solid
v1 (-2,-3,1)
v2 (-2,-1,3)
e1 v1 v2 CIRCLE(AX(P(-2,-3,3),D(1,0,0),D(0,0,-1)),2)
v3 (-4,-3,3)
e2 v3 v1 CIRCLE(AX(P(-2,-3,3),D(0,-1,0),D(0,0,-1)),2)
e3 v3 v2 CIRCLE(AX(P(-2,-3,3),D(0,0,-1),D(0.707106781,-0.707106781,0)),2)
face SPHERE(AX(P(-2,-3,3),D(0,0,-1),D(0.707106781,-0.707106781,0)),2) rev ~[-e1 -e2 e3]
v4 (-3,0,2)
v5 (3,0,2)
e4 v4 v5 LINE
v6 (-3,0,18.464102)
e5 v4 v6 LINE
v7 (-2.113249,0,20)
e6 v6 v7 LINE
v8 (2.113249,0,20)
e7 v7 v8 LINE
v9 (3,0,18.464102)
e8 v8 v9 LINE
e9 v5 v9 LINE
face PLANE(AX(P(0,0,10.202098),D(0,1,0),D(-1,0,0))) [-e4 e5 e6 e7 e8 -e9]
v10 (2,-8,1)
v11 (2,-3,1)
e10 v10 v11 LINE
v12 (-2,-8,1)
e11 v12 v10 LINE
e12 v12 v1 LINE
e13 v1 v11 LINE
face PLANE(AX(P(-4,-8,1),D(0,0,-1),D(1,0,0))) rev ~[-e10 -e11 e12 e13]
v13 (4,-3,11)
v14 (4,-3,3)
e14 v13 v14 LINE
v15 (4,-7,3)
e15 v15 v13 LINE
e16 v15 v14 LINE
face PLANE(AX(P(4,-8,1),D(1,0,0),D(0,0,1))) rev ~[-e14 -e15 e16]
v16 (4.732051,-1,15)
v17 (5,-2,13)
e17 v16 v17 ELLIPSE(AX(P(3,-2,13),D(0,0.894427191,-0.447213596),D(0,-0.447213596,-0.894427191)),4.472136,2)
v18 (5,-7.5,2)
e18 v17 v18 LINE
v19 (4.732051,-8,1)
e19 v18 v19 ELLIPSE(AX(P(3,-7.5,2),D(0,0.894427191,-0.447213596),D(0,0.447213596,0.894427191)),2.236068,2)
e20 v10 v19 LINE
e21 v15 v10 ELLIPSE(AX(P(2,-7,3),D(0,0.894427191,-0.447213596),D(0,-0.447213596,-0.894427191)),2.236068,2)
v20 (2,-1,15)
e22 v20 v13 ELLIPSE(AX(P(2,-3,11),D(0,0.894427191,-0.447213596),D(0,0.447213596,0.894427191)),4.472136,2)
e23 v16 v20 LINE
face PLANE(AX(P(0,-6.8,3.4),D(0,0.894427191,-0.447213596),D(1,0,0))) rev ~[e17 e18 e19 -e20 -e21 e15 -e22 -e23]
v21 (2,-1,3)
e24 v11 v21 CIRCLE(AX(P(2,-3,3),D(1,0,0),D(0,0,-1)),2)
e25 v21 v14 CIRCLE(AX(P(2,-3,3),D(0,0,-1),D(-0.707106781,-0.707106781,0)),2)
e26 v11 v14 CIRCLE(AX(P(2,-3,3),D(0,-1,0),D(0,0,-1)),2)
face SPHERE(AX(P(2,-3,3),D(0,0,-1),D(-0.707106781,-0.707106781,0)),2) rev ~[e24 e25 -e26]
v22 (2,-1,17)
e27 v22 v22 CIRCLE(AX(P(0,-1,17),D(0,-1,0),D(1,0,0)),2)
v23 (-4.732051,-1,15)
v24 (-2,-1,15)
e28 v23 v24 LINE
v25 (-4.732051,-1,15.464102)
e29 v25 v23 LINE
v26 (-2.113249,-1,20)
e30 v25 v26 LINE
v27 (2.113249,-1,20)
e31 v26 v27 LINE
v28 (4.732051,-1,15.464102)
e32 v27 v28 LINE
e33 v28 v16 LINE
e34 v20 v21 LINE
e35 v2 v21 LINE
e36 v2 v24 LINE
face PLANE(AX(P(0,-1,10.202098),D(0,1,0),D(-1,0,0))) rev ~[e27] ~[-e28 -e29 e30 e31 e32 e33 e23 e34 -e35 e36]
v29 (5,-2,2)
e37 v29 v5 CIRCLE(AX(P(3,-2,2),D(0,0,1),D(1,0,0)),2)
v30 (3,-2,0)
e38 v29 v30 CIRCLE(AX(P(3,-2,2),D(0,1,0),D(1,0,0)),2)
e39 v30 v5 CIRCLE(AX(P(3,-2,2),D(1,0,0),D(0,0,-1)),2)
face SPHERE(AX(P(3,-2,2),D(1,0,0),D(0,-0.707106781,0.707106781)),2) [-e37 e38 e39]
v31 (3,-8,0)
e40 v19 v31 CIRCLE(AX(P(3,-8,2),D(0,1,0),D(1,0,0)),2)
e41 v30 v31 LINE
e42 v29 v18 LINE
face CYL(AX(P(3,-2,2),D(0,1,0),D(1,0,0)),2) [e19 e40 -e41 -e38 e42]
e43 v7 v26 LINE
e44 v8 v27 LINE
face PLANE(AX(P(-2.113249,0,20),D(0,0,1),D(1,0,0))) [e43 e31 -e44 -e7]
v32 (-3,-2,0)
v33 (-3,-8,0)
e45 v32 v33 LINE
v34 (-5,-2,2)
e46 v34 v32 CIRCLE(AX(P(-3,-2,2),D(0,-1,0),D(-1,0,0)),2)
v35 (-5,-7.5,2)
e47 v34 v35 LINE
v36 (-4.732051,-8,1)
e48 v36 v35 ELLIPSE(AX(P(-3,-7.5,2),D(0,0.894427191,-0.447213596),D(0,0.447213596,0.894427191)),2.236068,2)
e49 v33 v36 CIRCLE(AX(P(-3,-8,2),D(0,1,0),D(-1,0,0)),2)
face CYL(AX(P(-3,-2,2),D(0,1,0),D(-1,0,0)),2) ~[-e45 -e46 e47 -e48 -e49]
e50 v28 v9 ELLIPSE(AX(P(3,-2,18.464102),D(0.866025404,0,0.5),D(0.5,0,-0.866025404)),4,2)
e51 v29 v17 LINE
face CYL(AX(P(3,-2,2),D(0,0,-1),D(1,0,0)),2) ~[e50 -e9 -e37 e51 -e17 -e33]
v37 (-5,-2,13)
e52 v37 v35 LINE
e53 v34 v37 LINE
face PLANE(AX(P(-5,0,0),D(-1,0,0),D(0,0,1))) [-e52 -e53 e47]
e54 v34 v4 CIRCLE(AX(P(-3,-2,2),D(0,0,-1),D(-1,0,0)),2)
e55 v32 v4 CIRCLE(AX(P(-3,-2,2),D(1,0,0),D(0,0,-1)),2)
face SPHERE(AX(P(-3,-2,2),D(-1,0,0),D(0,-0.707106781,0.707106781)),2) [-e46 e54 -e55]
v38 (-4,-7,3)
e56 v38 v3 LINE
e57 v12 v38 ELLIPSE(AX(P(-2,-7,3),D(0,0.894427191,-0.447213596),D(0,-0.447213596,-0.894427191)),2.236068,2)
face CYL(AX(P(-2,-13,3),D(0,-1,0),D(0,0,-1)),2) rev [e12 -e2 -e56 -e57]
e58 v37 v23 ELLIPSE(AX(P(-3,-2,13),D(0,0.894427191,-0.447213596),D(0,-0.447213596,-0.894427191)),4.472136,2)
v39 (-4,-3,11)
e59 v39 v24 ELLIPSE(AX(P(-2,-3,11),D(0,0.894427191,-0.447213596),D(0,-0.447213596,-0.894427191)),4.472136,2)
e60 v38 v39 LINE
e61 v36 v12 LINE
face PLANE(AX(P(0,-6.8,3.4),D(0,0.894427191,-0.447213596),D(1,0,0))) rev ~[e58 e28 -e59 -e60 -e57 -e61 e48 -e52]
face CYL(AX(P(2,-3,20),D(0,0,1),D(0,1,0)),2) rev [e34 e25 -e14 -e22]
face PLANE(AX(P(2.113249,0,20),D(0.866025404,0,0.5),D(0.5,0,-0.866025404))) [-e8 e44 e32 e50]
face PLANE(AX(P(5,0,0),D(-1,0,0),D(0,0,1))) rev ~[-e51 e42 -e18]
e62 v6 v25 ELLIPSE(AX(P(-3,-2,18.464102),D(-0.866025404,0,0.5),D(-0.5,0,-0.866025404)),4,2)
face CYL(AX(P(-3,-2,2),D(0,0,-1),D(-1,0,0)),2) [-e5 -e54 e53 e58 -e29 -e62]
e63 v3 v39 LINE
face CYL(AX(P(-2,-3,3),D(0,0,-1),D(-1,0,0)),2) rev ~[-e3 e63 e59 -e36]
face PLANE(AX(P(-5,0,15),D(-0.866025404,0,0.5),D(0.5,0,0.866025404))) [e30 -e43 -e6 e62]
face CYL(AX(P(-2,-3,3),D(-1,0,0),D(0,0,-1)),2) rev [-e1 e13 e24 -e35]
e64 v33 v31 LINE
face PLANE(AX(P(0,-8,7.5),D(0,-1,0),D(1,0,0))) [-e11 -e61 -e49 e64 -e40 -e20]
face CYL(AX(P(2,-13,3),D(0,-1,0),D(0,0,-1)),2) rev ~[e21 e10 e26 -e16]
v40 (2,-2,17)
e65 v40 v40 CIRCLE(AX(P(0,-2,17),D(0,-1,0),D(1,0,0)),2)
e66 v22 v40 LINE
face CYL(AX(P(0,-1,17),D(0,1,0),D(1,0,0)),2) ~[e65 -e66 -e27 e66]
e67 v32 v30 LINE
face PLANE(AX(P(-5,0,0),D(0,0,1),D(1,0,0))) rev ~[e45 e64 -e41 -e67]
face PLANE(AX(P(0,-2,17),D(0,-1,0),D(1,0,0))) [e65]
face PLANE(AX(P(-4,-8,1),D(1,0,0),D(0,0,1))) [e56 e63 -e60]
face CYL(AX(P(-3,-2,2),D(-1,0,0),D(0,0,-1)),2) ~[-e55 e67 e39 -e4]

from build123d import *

# Parameters (mm, degrees)
F0_W          = 10
F0_H          = 15
F1_DEPTH      = 8
F2_W          = 8
F2_H          = 14
F3_DEPTH      = 14
F5_DEPTH      = 25
F7_DEPTH      = 1
F8_R          = 2
F9_DEPTH      = 1
F10_T1_DEPTH  = 4
F10_S5_W      = 2.04
F10_S5_H      = 2.04
F10_T6_DEPTH  = 2.04
F10_S11_W     = 2.04
F10_S11_H     = 2.04
F10_T12_DEPTH = 2.04
F10_T18_DEPTH = 10
F10_T23_DEPTH = 10
F10_T28_DEPTH = 17
F10_T33_DEPTH = 17
F10_T35_DEPTH = 6
F10_T37_DEPTH = 18
F10_T39_DEPTH = 11
F10_S43_W     = 2.04
F10_S43_H     = 2.04
F10_T44_DEPTH = 2.04
F10_S49_W     = 2.04
F10_S49_H     = 2.04
F10_T50_DEPTH = 2.04


# Not quite as in the source:
# - a fillet or chamfer that OpenCascade refuses, or shapes differently, is made with other operations: its cross-section is extruded or revolved along the edge and cut away or added


with BuildPart() as f1:
    # F0 (on Front) → F1 (new body)
    with BuildSketch(Plane.XZ):
        with Locations((0, 7.5)):
            Rectangle(F0_W, F0_H)
    extrude(amount=F1_DEPTH)

    # F2 (on face) → F3 (cut)
    with BuildSketch(Plane.XZ.offset(8)):
        with Locations((0, 8)):
            Rectangle(F2_W, F2_H)
    extrude(amount=-F3_DEPTH, mode=Mode.SUBTRACT)

    # F4 (on face) → F5 (cut)
    with BuildSketch(Plane(origin=(-5, 0, 0), x_dir=(0, -1, 0), z_dir=(-1, 0, 0))):
        Polygon((8, 15), (1, 15), (8, 1), align=None)
    extrude(amount=-F5_DEPTH, mode=Mode.SUBTRACT)

    # F6 (on face) → F7 (join)
    with BuildSketch(Plane(origin=(0, 0, 0), x_dir=(-1, 0, 0), z_dir=(0, 1, 0))):
        Polygon((4, 15), (5, 15), (2.1132486541, 20), (-2.1132486541, 20), (-5, 15), (-4, 15), (-4, 1), (4, 1), align=None)
    extrude(amount=-F7_DEPTH)

    # F8 (on face) → F9 (join)
    with BuildSketch(Plane.XZ.offset(1)):
        with Locations((0, 17)):
            Circle(F8_R)
    extrude(amount=F9_DEPTH)

    # F10: fillet of radius 2 on 12 edges, made by hand

    # F10_s2 → F10_t1 (join)
    with BuildSketch(Plane.YZ.offset(-2)):
        with BuildLine():
            ThreePointArc((-3, 1), (-1.5857864376, 1.5857864376), (-1, 3))
            Line((-1, 3), (-1, 1))
            Line((-1, 1), (-3, 1))
        make_face()
    extrude(amount=F10_T1_DEPTH)


with BuildPart() as f10_tool4:
    # F10_s5 → F10_t6 (new body)
    with BuildSketch(Plane.XY.offset(3)):
        with Locations((-3.02, -1.98)):
            Rectangle(F10_S5_W, F10_S5_H)
    extrude(amount=-F10_T6_DEPTH)

    # F10_s7 → F10_t8 (revolve, cut)
    with BuildSketch(Plane(origin=(-2, -3, 3), x_dir=(0.7071067812, -0.7071067812, 0), z_dir=(0.7071067812, 0.7071067812, 0))):
        with BuildLine():
            ThreePointArc((0, -2), (2, 0), (0, 2))
            Line((0, 2), (0, -2))
        make_face()
    revolve(axis=Axis((-2, -3, 3), (0, 0, -1)), mode=Mode.SUBTRACT)


with BuildPart() as f1_1:
    add(f1.part)

    # F10_t3: union F10_tool4
    add(f10_tool4.part)


with BuildPart() as f10_tool10:
    # F10_s11 → F10_t12 (new body)
    with BuildSketch(Plane.XY.offset(3)):
        with Locations((3.02, -1.98)):
            Rectangle(F10_S11_W, F10_S11_H)
    extrude(amount=-F10_T12_DEPTH)

    # F10_s13 → F10_t14 (revolve, cut)
    with BuildSketch(Plane(origin=(2, -3, 3), x_dir=(-0.7071067812, -0.7071067812, 0), z_dir=(0.7071067812, -0.7071067812, 0))):
        with BuildLine():
            ThreePointArc((0, -2), (2, 0), (0, 2))
            Line((0, 2), (0, -2))
        make_face()
    revolve(axis=Axis((2, -3, 3), (0, 0, -1)), mode=Mode.SUBTRACT)


with BuildPart() as f1_2:
    add(f1_1.part)

    # F10_t9: union F10_tool10
    add(f10_tool10.part)


with BuildPart() as f10_tool16:
    # F10_s17 → F10_t18 (new body)
    with BuildSketch(Plane.XZ.offset(13)):
        with BuildLine():
            ThreePointArc((-2, 1), (-3.4142135624, 1.5857864376), (-4, 3))
            Line((-4, 3), (-4, 1))
            Line((-4, 1), (-2, 1))
        make_face()
    extrude(amount=-F10_T18_DEPTH)

    split(bisect_by=Plane(origin=(0, -6.8, 3.4), x_dir=(1, 0, 0), z_dir=(0, 0.894427191, -0.4472135955)), keep=Keep.TOP)


with BuildPart() as f1_3:
    add(f1_2.part)

    # F10_t15: union F10_tool16
    add(f10_tool16.part)


with BuildPart() as f10_tool21:
    # F10_s22 → F10_t23 (new body)
    with BuildSketch(Plane.XZ.offset(13)):
        with BuildLine():
            ThreePointArc((2, 1), (3.4142135624, 1.5857864376), (4, 3))
            Line((4, 3), (4, 1))
            Line((4, 1), (2, 1))
        make_face()
    extrude(amount=-F10_T23_DEPTH)

    split(bisect_by=Plane(origin=(0, -6.8, 3.4), x_dir=(1, 0, 0), z_dir=(0, 0.894427191, -0.4472135955)), keep=Keep.TOP)


with BuildPart() as f1_4:
    add(f1_3.part)

    # F10_t20: union F10_tool21
    add(f10_tool21.part)


with BuildPart() as f10_tool26:
    # F10_s27 → F10_t28 (new body)
    with BuildSketch(Plane.XY.offset(20)):
        with BuildLine():
            ThreePointArc((2, -1), (3.4142135624, -1.5857864376), (4, -3))
            Line((4, -3), (4, -1))
            Line((4, -1), (2, -1))
        make_face()
    extrude(amount=-F10_T28_DEPTH)

    split(bisect_by=Plane(origin=(0, -6.8, 3.4), x_dir=(1, 0, 0), z_dir=(0, 0.894427191, -0.4472135955)), keep=Keep.TOP)


with BuildPart() as f1_5:
    add(f1_4.part)

    # F10_t25: union F10_tool26
    add(f10_tool26.part)


with BuildPart() as f10_tool31:
    # F10_s32 → F10_t33 (new body)
    with BuildSketch(Plane.XY.offset(3)):
        with BuildLine():
            ThreePointArc((-4, -3), (-3.4142135624, -1.5857864376), (-2, -1))
            Line((-2, -1), (-4, -1))
            Line((-4, -1), (-4, -3))
        make_face()
    extrude(amount=F10_T33_DEPTH)

    split(bisect_by=Plane(origin=(0, -6.8, 3.4), x_dir=(1, 0, 0), z_dir=(0, 0.894427191, -0.4472135955)), keep=Keep.TOP)


with BuildPart() as f1_6:
    add(f1_5.part)

    # F10_t30: union F10_tool31
    add(f10_tool31.part)

    # F10_s36 → F10_t35 (cut)
    with BuildSketch(Plane.YZ.offset(-3)):
        with BuildLine():
            ThreePointArc((-2, 0), (-0.5857864376, 0.5857864376), (0, 2))
            Line((0, 2), (0, 0))
            Line((0, 0), (-2, 0))
        make_face()
    extrude(amount=F10_T35_DEPTH, mode=Mode.SUBTRACT)

    # F10_s38 → F10_t37 (cut)
    with BuildSketch(Plane.XY.offset(2)):
        with BuildLine():
            ThreePointArc((-5, -2), (-4.4142135624, -0.5857864376), (-3, 0))
            Line((-3, 0), (-5, 0))
            Line((-5, 0), (-5, -2))
        make_face()
        with BuildLine():
            ThreePointArc((5, -2), (4.4142135624, -0.5857864376), (3, 0))
            Line((3, 0), (5, 0))
            Line((5, 0), (5, -2))
        make_face()
    extrude(amount=F10_T37_DEPTH, mode=Mode.SUBTRACT)

    # F10_s40 → F10_t39 (cut)
    with BuildSketch(Plane.XZ.offset(2)):
        with BuildLine():
            ThreePointArc((-5, 2), (-4.4142135624, 0.5857864376), (-3, 0))
            Line((-3, 0), (-5, 0))
            Line((-5, 0), (-5, 2))
        make_face()
        with BuildLine():
            ThreePointArc((5, 2), (4.4142135624, 0.5857864376), (3, 0))
            Line((3, 0), (5, 0))
            Line((5, 0), (5, 2))
        make_face()
    extrude(amount=F10_T39_DEPTH, mode=Mode.SUBTRACT)


with BuildPart() as f10_tool42:
    # F10_s43 → F10_t44 (new body)
    with BuildSketch(Plane.YZ.offset(-3)):
        with Locations((-0.98, 0.98)):
            Rectangle(F10_S43_W, F10_S43_H)
    extrude(amount=-F10_T44_DEPTH)

    # F10_s45 → F10_t46 (revolve, cut)
    with BuildSketch(Plane(origin=(-3, -2, 2), x_dir=(0, -0.7071067812, 0.7071067812), z_dir=(0, -0.7071067812, -0.7071067812))):
        with BuildLine():
            ThreePointArc((0, -2), (2, 0), (0, 2))
            Line((0, 2), (0, -2))
        make_face()
    revolve(axis=Axis((-3, -2, 2), (-1, 0, 0)), mode=Mode.SUBTRACT)


with BuildPart() as f1_7:
    add(f1_6.part)

    # F10_t41: cut F10_tool42
    add(f10_tool42.part, mode=Mode.SUBTRACT)


with BuildPart() as f10_tool48:
    # F10_s49 → F10_t50 (new body)
    with BuildSketch(Plane.YZ.offset(3)):
        with Locations((-0.98, 0.98)):
            Rectangle(F10_S49_W, F10_S49_H)
    extrude(amount=F10_T50_DEPTH)

    # F10_s51 → F10_t52 (revolve, cut)
    with BuildSketch(Plane(origin=(3, -2, 2), x_dir=(0, -0.7071067812, 0.7071067812), z_dir=(0, 0.7071067812, 0.7071067812))):
        with BuildLine():
            ThreePointArc((0, -2), (2, 0), (0, 2))
            Line((0, 2), (0, -2))
        make_face()
    revolve(axis=Axis((3, -2, 2), (1, 0, 0)), mode=Mode.SUBTRACT)


with BuildPart() as f1_8:
    add(f1_7.part)

    # F10_t47: cut F10_tool48
    add(f10_tool48.part, mode=Mode.SUBTRACT)


solid = f1_8.part
